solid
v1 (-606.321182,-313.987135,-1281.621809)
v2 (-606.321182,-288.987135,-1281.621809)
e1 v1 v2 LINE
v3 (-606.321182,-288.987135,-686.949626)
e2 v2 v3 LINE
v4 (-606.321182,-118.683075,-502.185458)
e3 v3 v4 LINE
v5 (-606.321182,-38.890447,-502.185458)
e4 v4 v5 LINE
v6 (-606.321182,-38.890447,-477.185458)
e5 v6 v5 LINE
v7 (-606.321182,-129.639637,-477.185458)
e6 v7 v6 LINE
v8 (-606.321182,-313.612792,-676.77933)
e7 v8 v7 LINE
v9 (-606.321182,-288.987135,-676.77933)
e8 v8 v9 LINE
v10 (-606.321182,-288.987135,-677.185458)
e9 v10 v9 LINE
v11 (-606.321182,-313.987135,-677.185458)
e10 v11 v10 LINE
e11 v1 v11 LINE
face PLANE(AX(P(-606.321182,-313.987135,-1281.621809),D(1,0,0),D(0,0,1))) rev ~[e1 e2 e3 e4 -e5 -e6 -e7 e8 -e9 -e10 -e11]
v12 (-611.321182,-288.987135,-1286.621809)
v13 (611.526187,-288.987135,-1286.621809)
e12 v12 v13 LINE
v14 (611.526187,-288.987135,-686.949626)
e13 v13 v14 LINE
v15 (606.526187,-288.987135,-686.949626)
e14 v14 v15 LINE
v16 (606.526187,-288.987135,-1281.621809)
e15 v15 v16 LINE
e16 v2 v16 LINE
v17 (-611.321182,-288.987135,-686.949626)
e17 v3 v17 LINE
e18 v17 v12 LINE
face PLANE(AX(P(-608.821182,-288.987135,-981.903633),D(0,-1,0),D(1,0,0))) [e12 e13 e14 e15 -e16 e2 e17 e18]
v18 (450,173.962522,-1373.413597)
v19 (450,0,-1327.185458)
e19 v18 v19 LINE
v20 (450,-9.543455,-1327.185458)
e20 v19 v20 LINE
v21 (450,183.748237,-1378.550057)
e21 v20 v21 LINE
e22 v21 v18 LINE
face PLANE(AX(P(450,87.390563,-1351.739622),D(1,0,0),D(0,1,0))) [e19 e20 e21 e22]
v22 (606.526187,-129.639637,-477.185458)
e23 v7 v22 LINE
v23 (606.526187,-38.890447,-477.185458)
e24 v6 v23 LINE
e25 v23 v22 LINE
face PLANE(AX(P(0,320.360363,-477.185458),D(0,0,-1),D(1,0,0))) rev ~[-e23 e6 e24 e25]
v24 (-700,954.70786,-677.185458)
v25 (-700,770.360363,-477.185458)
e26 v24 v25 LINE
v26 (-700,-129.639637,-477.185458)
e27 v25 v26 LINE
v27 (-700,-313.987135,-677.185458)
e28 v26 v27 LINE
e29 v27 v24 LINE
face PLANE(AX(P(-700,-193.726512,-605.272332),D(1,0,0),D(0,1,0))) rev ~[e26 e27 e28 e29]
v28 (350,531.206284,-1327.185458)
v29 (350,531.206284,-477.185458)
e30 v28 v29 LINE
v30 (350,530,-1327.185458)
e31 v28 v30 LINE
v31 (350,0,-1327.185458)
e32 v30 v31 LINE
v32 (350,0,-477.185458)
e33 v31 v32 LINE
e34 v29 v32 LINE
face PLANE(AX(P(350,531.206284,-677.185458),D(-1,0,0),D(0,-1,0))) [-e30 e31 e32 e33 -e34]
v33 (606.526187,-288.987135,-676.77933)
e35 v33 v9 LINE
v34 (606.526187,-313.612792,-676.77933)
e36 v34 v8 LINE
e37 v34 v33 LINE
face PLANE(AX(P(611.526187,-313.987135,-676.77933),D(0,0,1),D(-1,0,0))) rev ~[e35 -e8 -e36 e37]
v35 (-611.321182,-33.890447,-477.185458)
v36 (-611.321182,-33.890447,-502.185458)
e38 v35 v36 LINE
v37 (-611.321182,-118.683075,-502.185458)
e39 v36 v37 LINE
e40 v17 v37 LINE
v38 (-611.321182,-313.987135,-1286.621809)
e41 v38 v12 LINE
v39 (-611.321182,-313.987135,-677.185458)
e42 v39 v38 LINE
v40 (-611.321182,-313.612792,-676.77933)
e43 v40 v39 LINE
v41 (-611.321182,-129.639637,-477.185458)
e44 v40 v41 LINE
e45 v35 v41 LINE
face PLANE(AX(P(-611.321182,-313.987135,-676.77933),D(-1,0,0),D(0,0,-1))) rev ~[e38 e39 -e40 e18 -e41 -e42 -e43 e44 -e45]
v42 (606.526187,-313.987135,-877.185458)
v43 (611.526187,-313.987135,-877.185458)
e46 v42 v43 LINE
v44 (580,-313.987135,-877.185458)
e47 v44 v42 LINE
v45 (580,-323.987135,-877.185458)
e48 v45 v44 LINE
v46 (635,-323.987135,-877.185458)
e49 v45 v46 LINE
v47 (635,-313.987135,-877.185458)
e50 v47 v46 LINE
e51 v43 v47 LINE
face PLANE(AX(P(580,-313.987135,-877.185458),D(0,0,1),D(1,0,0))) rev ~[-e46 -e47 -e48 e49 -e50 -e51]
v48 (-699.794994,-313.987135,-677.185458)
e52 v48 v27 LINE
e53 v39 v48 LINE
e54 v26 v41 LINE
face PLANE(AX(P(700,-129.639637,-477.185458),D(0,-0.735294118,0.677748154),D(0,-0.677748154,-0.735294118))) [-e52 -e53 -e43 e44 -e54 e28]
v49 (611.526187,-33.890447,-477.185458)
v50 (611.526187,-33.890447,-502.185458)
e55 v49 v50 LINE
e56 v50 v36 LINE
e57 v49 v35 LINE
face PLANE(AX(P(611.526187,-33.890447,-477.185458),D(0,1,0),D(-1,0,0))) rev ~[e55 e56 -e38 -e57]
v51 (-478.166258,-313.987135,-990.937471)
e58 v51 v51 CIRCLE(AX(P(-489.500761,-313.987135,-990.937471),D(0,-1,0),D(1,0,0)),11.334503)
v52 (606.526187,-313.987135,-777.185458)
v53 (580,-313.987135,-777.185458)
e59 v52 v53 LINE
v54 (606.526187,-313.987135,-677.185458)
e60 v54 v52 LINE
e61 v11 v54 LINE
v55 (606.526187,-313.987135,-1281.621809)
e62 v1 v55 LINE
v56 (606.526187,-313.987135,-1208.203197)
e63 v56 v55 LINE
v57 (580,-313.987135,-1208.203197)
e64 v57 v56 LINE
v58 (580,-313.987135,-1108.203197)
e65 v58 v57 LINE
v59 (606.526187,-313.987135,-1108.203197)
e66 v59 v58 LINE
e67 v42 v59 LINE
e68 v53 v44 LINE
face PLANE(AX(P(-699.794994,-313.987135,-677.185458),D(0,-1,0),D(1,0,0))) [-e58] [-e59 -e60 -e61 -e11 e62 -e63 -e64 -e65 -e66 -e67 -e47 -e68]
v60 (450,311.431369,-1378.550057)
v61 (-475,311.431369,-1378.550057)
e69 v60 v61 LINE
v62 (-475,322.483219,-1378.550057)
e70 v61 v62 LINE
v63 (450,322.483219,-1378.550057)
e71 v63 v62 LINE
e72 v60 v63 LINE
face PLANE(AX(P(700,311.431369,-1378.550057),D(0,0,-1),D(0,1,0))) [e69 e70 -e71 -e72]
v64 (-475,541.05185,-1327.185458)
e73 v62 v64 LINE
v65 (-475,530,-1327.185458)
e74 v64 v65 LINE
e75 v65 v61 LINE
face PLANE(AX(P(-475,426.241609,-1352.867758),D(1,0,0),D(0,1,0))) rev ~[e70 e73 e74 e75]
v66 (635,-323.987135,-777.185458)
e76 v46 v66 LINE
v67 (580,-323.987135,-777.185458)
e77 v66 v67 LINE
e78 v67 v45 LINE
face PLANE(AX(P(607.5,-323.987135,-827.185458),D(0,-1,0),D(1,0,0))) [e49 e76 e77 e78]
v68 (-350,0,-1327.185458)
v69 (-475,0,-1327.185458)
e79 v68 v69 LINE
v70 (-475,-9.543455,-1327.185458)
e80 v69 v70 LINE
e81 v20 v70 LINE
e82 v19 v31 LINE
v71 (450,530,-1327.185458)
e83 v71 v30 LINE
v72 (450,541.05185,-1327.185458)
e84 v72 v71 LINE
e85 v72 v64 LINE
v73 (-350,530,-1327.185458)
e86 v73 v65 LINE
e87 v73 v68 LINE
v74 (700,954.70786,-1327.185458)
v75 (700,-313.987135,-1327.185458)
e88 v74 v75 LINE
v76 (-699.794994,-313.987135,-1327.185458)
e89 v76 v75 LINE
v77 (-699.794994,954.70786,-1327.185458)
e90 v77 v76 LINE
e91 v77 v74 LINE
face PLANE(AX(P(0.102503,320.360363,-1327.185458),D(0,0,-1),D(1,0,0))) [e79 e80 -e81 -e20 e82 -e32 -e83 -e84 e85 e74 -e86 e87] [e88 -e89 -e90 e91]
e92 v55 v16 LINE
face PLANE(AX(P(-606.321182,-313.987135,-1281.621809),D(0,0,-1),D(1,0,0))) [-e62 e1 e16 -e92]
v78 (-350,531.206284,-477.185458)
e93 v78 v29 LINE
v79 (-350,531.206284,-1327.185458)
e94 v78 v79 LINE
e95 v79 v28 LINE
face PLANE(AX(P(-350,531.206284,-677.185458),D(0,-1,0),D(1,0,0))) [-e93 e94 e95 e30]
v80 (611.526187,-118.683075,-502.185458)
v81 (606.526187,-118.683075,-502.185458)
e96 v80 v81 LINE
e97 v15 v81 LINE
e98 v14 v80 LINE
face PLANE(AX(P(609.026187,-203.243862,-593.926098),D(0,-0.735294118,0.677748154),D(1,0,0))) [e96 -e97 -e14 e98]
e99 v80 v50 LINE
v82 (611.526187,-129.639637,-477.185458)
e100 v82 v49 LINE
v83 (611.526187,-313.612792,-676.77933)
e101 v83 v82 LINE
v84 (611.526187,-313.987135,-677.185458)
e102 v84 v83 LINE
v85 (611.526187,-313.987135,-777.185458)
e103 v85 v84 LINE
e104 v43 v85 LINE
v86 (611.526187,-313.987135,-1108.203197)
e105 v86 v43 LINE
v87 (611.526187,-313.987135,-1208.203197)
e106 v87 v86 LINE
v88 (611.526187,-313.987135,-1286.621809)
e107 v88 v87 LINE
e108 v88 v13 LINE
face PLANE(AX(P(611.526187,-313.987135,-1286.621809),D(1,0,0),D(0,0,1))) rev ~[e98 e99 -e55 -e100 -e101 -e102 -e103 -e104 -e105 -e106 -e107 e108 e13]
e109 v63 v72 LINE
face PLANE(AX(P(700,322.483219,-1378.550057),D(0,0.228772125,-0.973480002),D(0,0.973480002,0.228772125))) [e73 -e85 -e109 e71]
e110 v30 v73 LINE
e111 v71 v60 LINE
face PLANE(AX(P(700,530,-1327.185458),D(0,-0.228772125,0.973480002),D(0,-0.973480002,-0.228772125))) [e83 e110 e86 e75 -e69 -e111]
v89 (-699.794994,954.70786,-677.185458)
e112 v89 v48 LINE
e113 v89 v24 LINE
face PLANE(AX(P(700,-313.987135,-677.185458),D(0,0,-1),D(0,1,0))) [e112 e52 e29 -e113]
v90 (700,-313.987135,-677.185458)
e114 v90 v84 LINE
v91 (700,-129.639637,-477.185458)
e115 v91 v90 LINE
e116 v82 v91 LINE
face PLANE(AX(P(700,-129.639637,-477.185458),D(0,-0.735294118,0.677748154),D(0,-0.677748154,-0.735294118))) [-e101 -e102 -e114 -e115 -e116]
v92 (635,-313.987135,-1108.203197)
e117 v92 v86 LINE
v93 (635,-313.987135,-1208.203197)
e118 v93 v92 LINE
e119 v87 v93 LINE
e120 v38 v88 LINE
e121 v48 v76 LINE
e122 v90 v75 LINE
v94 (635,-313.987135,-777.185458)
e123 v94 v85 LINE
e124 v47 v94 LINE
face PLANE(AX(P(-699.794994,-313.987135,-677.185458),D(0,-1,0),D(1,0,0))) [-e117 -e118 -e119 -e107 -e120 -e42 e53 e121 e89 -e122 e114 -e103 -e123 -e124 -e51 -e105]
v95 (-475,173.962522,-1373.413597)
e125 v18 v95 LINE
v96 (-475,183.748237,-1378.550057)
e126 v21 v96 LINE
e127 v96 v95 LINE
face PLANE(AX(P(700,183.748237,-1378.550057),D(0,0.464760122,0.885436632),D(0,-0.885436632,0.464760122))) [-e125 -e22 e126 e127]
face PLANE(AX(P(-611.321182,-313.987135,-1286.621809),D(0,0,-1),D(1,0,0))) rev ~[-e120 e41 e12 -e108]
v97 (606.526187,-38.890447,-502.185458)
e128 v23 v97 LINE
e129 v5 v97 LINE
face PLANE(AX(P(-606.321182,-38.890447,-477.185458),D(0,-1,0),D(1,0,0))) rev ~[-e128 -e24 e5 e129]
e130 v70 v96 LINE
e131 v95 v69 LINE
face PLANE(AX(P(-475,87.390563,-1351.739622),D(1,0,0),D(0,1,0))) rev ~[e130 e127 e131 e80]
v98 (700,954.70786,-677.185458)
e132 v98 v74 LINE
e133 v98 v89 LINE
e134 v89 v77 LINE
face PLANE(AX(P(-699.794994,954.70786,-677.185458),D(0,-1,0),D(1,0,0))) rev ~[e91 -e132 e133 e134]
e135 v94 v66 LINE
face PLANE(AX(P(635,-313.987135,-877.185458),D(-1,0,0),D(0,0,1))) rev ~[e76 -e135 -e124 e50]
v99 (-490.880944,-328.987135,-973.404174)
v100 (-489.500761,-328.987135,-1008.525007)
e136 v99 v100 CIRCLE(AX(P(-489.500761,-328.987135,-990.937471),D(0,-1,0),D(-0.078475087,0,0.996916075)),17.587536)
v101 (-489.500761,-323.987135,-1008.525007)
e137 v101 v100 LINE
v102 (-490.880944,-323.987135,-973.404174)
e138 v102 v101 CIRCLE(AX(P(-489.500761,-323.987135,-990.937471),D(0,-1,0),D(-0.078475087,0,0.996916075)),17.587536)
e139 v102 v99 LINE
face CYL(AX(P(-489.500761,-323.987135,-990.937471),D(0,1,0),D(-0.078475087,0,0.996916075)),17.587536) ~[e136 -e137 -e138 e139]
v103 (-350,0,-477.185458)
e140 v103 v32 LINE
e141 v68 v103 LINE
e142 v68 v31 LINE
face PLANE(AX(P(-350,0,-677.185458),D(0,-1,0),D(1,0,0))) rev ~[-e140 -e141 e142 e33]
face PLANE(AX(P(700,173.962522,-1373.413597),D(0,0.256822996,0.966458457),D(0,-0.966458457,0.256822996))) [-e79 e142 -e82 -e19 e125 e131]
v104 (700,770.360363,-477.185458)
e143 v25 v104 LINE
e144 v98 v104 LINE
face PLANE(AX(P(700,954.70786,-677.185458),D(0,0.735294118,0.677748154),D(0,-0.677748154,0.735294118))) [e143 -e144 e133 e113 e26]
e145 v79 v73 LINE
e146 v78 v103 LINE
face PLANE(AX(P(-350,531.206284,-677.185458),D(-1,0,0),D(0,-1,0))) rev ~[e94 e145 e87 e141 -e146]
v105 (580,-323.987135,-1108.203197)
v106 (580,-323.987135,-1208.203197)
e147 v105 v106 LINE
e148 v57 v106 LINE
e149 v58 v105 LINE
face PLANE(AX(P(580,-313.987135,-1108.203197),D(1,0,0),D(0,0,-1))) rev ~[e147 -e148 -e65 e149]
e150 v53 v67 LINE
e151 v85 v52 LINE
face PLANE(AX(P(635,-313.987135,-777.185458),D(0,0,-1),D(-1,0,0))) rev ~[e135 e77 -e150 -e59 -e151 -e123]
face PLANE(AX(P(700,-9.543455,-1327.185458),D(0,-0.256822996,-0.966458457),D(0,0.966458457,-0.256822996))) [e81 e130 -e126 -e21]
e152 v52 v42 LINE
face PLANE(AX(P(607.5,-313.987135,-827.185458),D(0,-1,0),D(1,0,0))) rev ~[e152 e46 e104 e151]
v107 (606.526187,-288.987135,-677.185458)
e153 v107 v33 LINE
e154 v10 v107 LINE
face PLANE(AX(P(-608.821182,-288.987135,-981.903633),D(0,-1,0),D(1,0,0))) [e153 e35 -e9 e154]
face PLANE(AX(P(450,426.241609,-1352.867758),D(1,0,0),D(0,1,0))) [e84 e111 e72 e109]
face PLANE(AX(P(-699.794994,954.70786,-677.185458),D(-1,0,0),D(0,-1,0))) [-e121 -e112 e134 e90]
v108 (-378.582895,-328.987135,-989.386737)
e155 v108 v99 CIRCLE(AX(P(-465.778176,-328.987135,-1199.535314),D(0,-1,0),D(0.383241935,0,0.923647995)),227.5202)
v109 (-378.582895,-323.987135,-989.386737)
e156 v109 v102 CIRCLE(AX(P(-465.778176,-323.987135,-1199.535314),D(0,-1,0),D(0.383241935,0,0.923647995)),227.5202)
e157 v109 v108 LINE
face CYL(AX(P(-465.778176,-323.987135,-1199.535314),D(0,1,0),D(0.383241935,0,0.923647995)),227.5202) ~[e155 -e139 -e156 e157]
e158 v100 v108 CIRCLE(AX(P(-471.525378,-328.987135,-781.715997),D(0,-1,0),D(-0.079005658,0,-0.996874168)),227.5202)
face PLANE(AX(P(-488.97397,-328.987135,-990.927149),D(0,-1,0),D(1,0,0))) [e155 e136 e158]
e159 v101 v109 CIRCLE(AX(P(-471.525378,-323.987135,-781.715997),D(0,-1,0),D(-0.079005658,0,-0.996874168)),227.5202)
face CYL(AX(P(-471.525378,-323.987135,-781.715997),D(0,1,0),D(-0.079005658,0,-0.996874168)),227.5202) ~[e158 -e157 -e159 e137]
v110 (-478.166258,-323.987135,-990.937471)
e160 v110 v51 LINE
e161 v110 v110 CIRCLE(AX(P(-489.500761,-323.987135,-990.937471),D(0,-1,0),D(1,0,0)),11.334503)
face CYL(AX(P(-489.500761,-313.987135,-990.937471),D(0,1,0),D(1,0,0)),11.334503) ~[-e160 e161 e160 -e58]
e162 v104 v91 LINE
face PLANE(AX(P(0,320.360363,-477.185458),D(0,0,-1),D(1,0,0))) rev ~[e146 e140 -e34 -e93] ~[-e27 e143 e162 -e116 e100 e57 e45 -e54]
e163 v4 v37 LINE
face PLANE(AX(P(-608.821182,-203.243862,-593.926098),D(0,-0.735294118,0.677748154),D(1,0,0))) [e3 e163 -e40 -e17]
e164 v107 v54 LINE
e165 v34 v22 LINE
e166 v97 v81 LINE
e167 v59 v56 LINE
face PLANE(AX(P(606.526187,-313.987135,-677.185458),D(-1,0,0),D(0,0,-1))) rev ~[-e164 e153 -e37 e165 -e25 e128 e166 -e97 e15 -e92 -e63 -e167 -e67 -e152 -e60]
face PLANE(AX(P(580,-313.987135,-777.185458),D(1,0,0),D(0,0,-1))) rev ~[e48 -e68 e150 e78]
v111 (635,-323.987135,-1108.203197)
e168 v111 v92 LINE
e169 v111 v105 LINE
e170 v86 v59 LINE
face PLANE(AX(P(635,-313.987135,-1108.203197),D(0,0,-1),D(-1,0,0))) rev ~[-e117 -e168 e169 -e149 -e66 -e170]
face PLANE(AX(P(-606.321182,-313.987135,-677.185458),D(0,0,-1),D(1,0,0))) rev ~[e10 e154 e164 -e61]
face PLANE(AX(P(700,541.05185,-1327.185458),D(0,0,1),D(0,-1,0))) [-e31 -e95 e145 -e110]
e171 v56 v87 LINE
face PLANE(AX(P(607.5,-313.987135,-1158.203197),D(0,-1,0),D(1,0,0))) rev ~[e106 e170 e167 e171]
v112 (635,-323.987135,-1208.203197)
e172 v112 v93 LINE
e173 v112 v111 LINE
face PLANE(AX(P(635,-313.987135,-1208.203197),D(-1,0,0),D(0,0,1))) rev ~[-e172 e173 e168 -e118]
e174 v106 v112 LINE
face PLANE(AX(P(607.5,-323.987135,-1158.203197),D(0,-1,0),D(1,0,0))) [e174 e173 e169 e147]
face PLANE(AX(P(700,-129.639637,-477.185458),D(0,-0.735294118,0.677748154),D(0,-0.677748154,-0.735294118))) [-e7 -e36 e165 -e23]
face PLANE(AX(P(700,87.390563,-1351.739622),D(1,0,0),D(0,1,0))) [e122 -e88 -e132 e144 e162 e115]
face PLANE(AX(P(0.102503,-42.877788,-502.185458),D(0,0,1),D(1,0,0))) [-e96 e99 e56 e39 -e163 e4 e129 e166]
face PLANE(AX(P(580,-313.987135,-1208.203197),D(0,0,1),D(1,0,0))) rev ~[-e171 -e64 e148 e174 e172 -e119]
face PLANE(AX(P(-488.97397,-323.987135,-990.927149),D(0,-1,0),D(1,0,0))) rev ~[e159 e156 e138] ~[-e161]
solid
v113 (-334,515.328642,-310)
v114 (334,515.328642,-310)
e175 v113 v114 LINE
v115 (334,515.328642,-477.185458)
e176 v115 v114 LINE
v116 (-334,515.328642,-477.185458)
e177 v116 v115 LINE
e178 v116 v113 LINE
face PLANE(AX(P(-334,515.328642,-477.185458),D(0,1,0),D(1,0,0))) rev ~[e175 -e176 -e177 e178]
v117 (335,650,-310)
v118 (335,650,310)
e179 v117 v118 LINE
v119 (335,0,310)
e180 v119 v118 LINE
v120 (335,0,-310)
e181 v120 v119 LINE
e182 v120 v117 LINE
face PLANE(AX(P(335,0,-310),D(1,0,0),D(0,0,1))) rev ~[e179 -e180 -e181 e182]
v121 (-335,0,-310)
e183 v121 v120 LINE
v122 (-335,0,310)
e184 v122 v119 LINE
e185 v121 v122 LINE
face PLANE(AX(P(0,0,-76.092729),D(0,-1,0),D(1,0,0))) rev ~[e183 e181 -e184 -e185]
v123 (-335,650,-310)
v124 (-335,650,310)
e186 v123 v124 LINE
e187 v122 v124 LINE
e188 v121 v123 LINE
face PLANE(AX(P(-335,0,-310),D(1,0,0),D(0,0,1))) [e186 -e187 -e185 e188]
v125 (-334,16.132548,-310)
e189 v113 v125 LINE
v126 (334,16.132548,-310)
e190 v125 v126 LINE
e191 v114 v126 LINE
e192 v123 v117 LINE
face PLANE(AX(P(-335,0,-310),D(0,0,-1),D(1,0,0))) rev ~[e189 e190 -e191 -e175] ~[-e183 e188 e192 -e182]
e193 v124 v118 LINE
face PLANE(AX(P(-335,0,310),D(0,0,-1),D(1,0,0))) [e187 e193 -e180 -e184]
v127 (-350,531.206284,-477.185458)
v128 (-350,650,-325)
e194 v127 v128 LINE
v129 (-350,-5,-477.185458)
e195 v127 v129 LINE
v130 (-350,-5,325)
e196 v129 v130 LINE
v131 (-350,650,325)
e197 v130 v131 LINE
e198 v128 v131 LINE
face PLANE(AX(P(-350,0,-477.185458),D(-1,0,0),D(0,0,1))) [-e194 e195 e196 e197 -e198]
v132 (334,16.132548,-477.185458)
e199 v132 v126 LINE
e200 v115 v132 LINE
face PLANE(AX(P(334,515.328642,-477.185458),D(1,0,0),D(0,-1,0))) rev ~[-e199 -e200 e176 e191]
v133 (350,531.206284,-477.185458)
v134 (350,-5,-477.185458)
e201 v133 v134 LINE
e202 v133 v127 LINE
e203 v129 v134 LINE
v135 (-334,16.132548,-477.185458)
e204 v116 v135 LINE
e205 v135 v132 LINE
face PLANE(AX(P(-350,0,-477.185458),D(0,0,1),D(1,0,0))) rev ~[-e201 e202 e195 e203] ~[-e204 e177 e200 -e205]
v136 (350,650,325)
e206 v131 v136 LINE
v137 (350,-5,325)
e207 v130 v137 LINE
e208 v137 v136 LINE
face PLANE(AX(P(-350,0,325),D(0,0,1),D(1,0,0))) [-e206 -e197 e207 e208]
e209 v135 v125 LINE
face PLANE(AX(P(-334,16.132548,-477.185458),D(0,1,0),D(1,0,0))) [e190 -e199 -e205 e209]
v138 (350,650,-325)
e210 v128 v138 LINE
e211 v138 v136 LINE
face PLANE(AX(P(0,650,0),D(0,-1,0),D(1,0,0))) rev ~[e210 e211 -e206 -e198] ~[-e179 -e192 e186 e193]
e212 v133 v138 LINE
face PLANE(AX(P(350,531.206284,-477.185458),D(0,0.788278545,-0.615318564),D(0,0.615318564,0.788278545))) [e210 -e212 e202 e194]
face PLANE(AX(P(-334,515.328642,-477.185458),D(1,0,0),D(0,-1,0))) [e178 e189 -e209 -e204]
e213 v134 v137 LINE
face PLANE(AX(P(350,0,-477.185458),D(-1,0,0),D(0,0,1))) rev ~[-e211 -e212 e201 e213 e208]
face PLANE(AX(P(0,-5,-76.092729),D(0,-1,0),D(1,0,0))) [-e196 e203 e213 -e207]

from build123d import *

# Parameters (mm, degrees)
F0_W      = 700
F0_H      = 650
F0_W_2    = 670
F0_H_2    = 620
F1_DEPTH  = 650
F3_DEPTH  = 700
F4_W      = 1400
F4_H      = 900
F4_W_2    = 700
F4_H_2    = 531.2062842084
F5_DEPTH  = 200
F7_DEPTH  = 1400
F8_W      = 1399.7949943277
F8_H      = 1268.6949958977
F8_W_2    = 700
F8_H_2    = 531.2062842084
F9_DEPTH  = 650
F10_W     = 1222.8473691637
F10_H     = 0.4061281681
F10_W_2   = 1212.8473691637
F10_H_2   = 5
F11_DEPTH = 25
F12_W     = 5
F12_H     = 271.4476656914
F13_DEPTH = 25
F15_DEPTH = 25
F16_R     = 11.3345027625
F17_DEPTH = 5
F18_DEPTH = 10
F20_DEPTH = 5
F21_W     = 668
F21_H     = 499.1960943538
F22_DEPTH = 170
F23_W     = 700
F23_H     = 802.1854579449
F24_DEPTH = 5
F26_DEPTH = 1175
F28_DEPTH = 250
F30_DEPTH = 250


# Not quite as in the source:
# - a feature names something its author has since deleted; it is built from what else it names


with BuildPart() as f1:
    # F0 (on Front) → F1 (new body)
    with BuildSketch(Plane.XZ):
        Rectangle(F0_W, F0_H)
        Rectangle(F0_W_2, F0_H_2, mode=Mode.SUBTRACT)
    extrude(amount=-F1_DEPTH)

    # F2 (on face) → F3 (join)
    with BuildSketch(Plane.YZ.offset(350)):
        Polygon((531.2062842084, -477.1854579449), (650, -325), (0, -325), (0, -477.1854579449), align=None)
    extrude(amount=-F3_DEPTH)

    # F21 (on face) → F22 (cut)
    with BuildSketch(Plane(origin=(0, 0, -477.1854579449), x_dir=(1, 0, 0), z_dir=(0, 0, -1))):
        with Locations((0, -265.7305951914)):
            Rectangle(F21_W, F21_H)
    extrude(amount=-F22_DEPTH, mode=Mode.SUBTRACT)

    # F23 (on face) → F24 (join)
    with BuildSketch(Plane.XZ):
        with Locations((0, -76.0927289724)):
            Rectangle(F23_W, F23_H)
    extrude(amount=F24_DEPTH)


with BuildPart() as f5:
    # F4 (on face) → F5 (new body)
    with BuildSketch(Plane(origin=(0, 0, -477.1854579449), x_dir=(1, 0, 0), z_dir=(0, 0, -1))):
        with Locations((0, -320.3603625298)):
            Rectangle(F4_W, F4_H)
        with Locations((0, -265.6031421042)):
            Rectangle(F4_W_2, F4_H_2, mode=Mode.SUBTRACT)
    extrude(amount=F5_DEPTH)

    # F6 (on face) → F7 (join)
    with BuildSketch(Plane.YZ.offset(700)):
        Polygon((-129.6396374702, -677.1854579449), (-129.6396374702, -477.1854579449), (-313.9871354191, -677.1854579449), align=None)
        Polygon((770.3603625298, -477.1854579449), (770.3603625298, -677.1854579449), (954.7078604786, -677.1854579449), align=None)
    extrude(amount=-F7_DEPTH)

    # F8 (on face) → F9 (join)
    with BuildSketch(Plane(origin=(0, 0, -677.1854579449), x_dir=(1, 0, 0), z_dir=(0, 0, -1))):
        with Locations((0.1025028361, -320.3603625298)):
            Rectangle(F8_W, F8_H)
        with Locations((0, -265.6031421042)):
            Rectangle(F8_W_2, F8_H_2, mode=Mode.SUBTRACT)
    extrude(amount=F9_DEPTH)

    # F10 (on face) → F11 (cut)
    with BuildSketch(Plane.XZ.offset(313.9871354191)):
        with Locations((0.1025028361, -1327.3885220289)):
            Rectangle(F10_W, F10_H)
        Polygon((-606.3211817457, -677.1854579449), (-611.3211817457, -677.1854579449), (-611.3211817457, -1286.6218090057), (-606.3211817457, -1286.6218090057), (-606.3211817457, -1281.6218090057), align=None)
        Polygon((611.526187418, -1286.6218090057), (611.526187418, -677.1854579449), (606.526187418, -677.1854579449), (606.526187418, -1281.6218090057), (606.526187418, -1286.6218090057), align=None)
        Polygon((611.526187418, -676.7793297768), (-611.3211817457, -676.7793297768), (-611.3211817457, -677.1854579449), (-606.3211817457, -677.1854579449), (606.526187418, -677.1854579449), (611.526187418, -677.1854579449), align=None)
        with Locations((0.1025028361, -1284.1218090057)):
            Rectangle(F10_W_2, F10_H_2)
    extrude(amount=-F11_DEPTH, mode=Mode.SUBTRACT)

    # F12 (on face) → F13 (cut)
    with BuildSketch(Plane(origin=(0, 167.7119856609, -154.5864246631), x_dir=(1, 0, 0), z_dir=(0, -0.7352941176, 0.6777481542))):
        with Locations((609.026187418, -574.458518109)):
            Rectangle(F12_W, F12_H)
        with Locations((-608.8211817457, -574.458518109)):
            Rectangle(F12_W, F12_H)
    extrude(amount=-F13_DEPTH, mode=Mode.SUBTRACT)

    # F14 (on face) → F15 (cut)
    with BuildSketch(Plane.XY.offset(-477.1854579449)):
        Polygon((611.526187418, -33.8904465006), (-611.3211817457, -33.8904465006), (-611.3211817457, -129.6396374702), (-606.3211817457, -129.6396374702), (-606.3211817457, -38.8904465006), (606.526187418, -38.8904465006), (606.526187418, -129.6396374702), (611.526187418, -129.6396374702), align=None)
    extrude(amount=-F15_DEPTH, mode=Mode.SUBTRACT)

    # F16 (on face) → F17 (join)
    with BuildSketch(Plane.XZ.offset(313.9871354191)):
        Polygon((635, -1108.2031965256), (580, -1108.2031965256), (580, -1208.2031965256), (635, -1208.2031965256), (635, -1168.8231229782), align=None)
        Polygon((635, -777.1854579449), (580, -777.1854579449), (580, -877.1854579449), (635, -877.1854579449), (635, -808.090031147), align=None)
        with Locations((-489.5007610321, -990.9374713898)):
            Circle(F16_R)
    extrude(amount=F17_DEPTH)

    # F16 (on face) → F18 (join)
    with BuildSketch(Plane.XZ.offset(313.9871354191)):
        Polygon((635, -1108.2031965256), (580, -1108.2031965256), (580, -1208.2031965256), (635, -1208.2031965256), (635, -1168.8231229782), align=None)
        Polygon((635, -777.1854579449), (580, -777.1854579449), (580, -877.1854579449), (635, -877.1854579449), (635, -808.090031147), align=None)
        with Locations((-489.5007610321, -990.9374713898)):
            Circle(F16_R)
    extrude(amount=F18_DEPTH)

    # F19 (on face) → F20 (join)
    with BuildSketch(Plane.XZ.offset(323.9871354191)):
        with BuildLine():
            ThreePointArc((-489.5007610321, -1008.5250073511), (-477.0644950895, -1003.3737373324), (-471.9132250707, -990.9374713898))
            ThreePointArc((-471.9132250707, -990.9374713898), (-477.5624320948, -978.0224520952), (-490.8809444539, -973.4041740697))
            ThreePointArc((-490.8809444539, -973.4041740697), (-507.074732102, -991.6280957645), (-489.5007610321, -1008.5250073511))
        make_face()
        with BuildLine():
            ThreePointArc((-490.8809444539, -973.4041740697), (-477.5624320948, -978.0224520952), (-471.9132250707, -990.9374713898))
            ThreePointArc((-471.9132250707, -990.9374713898), (-477.0644950895, -1003.3737373324), (-489.5007610321, -1008.5250073511))
            ThreePointArc((-489.5007610321, -1008.5250073511), (-432.8396587778, -1005.9231706341), (-378.5828948021, -989.3867373466))
            ThreePointArc((-378.5828948021, -989.3867373466), (-433.7199381181, -974.2849848856), (-490.8809444539, -973.4041740697))
        make_face()
    extrude(amount=F20_DEPTH)

    # F25 (on face) → F26 (join)
    with BuildSketch(Plane.YZ.offset(700)):
        Polygon((173.9625222218, -1373.4135972352), (0, -1327.1854579449), (-9.543454825, -1327.1854579449), (183.7482365325, -1378.5500571563), align=None)
        Polygon((541.05185, -1327.1854579449), (530, -1327.1854579449), (311.4313689114, -1378.5500571563), (322.4832189114, -1378.5500571563), align=None)
    extrude(amount=-F26_DEPTH)

    # F27 (on face) → F28 (cut)
    with BuildSketch(Plane.YZ.offset(700)):
        Polygon((-9.543454825, -1327.1854579449), (183.7482365325, -1378.5500571563), (173.9625222218, -1373.4135972352), (0, -1327.1854579449), align=None)
    extrude(amount=-F28_DEPTH, mode=Mode.SUBTRACT)

    # F29 (on face) → F30 (cut)
    with BuildSketch(Plane.YZ.offset(700)):
        Polygon((530, -1327.1854579449), (311.4313689114, -1378.5500571563), (322.4832189114, -1378.5500571563), (541.05185, -1327.1854579449), align=None)
    extrude(amount=-F30_DEPTH, mode=Mode.SUBTRACT)


solid = Compound([f1.part, f5.part])
